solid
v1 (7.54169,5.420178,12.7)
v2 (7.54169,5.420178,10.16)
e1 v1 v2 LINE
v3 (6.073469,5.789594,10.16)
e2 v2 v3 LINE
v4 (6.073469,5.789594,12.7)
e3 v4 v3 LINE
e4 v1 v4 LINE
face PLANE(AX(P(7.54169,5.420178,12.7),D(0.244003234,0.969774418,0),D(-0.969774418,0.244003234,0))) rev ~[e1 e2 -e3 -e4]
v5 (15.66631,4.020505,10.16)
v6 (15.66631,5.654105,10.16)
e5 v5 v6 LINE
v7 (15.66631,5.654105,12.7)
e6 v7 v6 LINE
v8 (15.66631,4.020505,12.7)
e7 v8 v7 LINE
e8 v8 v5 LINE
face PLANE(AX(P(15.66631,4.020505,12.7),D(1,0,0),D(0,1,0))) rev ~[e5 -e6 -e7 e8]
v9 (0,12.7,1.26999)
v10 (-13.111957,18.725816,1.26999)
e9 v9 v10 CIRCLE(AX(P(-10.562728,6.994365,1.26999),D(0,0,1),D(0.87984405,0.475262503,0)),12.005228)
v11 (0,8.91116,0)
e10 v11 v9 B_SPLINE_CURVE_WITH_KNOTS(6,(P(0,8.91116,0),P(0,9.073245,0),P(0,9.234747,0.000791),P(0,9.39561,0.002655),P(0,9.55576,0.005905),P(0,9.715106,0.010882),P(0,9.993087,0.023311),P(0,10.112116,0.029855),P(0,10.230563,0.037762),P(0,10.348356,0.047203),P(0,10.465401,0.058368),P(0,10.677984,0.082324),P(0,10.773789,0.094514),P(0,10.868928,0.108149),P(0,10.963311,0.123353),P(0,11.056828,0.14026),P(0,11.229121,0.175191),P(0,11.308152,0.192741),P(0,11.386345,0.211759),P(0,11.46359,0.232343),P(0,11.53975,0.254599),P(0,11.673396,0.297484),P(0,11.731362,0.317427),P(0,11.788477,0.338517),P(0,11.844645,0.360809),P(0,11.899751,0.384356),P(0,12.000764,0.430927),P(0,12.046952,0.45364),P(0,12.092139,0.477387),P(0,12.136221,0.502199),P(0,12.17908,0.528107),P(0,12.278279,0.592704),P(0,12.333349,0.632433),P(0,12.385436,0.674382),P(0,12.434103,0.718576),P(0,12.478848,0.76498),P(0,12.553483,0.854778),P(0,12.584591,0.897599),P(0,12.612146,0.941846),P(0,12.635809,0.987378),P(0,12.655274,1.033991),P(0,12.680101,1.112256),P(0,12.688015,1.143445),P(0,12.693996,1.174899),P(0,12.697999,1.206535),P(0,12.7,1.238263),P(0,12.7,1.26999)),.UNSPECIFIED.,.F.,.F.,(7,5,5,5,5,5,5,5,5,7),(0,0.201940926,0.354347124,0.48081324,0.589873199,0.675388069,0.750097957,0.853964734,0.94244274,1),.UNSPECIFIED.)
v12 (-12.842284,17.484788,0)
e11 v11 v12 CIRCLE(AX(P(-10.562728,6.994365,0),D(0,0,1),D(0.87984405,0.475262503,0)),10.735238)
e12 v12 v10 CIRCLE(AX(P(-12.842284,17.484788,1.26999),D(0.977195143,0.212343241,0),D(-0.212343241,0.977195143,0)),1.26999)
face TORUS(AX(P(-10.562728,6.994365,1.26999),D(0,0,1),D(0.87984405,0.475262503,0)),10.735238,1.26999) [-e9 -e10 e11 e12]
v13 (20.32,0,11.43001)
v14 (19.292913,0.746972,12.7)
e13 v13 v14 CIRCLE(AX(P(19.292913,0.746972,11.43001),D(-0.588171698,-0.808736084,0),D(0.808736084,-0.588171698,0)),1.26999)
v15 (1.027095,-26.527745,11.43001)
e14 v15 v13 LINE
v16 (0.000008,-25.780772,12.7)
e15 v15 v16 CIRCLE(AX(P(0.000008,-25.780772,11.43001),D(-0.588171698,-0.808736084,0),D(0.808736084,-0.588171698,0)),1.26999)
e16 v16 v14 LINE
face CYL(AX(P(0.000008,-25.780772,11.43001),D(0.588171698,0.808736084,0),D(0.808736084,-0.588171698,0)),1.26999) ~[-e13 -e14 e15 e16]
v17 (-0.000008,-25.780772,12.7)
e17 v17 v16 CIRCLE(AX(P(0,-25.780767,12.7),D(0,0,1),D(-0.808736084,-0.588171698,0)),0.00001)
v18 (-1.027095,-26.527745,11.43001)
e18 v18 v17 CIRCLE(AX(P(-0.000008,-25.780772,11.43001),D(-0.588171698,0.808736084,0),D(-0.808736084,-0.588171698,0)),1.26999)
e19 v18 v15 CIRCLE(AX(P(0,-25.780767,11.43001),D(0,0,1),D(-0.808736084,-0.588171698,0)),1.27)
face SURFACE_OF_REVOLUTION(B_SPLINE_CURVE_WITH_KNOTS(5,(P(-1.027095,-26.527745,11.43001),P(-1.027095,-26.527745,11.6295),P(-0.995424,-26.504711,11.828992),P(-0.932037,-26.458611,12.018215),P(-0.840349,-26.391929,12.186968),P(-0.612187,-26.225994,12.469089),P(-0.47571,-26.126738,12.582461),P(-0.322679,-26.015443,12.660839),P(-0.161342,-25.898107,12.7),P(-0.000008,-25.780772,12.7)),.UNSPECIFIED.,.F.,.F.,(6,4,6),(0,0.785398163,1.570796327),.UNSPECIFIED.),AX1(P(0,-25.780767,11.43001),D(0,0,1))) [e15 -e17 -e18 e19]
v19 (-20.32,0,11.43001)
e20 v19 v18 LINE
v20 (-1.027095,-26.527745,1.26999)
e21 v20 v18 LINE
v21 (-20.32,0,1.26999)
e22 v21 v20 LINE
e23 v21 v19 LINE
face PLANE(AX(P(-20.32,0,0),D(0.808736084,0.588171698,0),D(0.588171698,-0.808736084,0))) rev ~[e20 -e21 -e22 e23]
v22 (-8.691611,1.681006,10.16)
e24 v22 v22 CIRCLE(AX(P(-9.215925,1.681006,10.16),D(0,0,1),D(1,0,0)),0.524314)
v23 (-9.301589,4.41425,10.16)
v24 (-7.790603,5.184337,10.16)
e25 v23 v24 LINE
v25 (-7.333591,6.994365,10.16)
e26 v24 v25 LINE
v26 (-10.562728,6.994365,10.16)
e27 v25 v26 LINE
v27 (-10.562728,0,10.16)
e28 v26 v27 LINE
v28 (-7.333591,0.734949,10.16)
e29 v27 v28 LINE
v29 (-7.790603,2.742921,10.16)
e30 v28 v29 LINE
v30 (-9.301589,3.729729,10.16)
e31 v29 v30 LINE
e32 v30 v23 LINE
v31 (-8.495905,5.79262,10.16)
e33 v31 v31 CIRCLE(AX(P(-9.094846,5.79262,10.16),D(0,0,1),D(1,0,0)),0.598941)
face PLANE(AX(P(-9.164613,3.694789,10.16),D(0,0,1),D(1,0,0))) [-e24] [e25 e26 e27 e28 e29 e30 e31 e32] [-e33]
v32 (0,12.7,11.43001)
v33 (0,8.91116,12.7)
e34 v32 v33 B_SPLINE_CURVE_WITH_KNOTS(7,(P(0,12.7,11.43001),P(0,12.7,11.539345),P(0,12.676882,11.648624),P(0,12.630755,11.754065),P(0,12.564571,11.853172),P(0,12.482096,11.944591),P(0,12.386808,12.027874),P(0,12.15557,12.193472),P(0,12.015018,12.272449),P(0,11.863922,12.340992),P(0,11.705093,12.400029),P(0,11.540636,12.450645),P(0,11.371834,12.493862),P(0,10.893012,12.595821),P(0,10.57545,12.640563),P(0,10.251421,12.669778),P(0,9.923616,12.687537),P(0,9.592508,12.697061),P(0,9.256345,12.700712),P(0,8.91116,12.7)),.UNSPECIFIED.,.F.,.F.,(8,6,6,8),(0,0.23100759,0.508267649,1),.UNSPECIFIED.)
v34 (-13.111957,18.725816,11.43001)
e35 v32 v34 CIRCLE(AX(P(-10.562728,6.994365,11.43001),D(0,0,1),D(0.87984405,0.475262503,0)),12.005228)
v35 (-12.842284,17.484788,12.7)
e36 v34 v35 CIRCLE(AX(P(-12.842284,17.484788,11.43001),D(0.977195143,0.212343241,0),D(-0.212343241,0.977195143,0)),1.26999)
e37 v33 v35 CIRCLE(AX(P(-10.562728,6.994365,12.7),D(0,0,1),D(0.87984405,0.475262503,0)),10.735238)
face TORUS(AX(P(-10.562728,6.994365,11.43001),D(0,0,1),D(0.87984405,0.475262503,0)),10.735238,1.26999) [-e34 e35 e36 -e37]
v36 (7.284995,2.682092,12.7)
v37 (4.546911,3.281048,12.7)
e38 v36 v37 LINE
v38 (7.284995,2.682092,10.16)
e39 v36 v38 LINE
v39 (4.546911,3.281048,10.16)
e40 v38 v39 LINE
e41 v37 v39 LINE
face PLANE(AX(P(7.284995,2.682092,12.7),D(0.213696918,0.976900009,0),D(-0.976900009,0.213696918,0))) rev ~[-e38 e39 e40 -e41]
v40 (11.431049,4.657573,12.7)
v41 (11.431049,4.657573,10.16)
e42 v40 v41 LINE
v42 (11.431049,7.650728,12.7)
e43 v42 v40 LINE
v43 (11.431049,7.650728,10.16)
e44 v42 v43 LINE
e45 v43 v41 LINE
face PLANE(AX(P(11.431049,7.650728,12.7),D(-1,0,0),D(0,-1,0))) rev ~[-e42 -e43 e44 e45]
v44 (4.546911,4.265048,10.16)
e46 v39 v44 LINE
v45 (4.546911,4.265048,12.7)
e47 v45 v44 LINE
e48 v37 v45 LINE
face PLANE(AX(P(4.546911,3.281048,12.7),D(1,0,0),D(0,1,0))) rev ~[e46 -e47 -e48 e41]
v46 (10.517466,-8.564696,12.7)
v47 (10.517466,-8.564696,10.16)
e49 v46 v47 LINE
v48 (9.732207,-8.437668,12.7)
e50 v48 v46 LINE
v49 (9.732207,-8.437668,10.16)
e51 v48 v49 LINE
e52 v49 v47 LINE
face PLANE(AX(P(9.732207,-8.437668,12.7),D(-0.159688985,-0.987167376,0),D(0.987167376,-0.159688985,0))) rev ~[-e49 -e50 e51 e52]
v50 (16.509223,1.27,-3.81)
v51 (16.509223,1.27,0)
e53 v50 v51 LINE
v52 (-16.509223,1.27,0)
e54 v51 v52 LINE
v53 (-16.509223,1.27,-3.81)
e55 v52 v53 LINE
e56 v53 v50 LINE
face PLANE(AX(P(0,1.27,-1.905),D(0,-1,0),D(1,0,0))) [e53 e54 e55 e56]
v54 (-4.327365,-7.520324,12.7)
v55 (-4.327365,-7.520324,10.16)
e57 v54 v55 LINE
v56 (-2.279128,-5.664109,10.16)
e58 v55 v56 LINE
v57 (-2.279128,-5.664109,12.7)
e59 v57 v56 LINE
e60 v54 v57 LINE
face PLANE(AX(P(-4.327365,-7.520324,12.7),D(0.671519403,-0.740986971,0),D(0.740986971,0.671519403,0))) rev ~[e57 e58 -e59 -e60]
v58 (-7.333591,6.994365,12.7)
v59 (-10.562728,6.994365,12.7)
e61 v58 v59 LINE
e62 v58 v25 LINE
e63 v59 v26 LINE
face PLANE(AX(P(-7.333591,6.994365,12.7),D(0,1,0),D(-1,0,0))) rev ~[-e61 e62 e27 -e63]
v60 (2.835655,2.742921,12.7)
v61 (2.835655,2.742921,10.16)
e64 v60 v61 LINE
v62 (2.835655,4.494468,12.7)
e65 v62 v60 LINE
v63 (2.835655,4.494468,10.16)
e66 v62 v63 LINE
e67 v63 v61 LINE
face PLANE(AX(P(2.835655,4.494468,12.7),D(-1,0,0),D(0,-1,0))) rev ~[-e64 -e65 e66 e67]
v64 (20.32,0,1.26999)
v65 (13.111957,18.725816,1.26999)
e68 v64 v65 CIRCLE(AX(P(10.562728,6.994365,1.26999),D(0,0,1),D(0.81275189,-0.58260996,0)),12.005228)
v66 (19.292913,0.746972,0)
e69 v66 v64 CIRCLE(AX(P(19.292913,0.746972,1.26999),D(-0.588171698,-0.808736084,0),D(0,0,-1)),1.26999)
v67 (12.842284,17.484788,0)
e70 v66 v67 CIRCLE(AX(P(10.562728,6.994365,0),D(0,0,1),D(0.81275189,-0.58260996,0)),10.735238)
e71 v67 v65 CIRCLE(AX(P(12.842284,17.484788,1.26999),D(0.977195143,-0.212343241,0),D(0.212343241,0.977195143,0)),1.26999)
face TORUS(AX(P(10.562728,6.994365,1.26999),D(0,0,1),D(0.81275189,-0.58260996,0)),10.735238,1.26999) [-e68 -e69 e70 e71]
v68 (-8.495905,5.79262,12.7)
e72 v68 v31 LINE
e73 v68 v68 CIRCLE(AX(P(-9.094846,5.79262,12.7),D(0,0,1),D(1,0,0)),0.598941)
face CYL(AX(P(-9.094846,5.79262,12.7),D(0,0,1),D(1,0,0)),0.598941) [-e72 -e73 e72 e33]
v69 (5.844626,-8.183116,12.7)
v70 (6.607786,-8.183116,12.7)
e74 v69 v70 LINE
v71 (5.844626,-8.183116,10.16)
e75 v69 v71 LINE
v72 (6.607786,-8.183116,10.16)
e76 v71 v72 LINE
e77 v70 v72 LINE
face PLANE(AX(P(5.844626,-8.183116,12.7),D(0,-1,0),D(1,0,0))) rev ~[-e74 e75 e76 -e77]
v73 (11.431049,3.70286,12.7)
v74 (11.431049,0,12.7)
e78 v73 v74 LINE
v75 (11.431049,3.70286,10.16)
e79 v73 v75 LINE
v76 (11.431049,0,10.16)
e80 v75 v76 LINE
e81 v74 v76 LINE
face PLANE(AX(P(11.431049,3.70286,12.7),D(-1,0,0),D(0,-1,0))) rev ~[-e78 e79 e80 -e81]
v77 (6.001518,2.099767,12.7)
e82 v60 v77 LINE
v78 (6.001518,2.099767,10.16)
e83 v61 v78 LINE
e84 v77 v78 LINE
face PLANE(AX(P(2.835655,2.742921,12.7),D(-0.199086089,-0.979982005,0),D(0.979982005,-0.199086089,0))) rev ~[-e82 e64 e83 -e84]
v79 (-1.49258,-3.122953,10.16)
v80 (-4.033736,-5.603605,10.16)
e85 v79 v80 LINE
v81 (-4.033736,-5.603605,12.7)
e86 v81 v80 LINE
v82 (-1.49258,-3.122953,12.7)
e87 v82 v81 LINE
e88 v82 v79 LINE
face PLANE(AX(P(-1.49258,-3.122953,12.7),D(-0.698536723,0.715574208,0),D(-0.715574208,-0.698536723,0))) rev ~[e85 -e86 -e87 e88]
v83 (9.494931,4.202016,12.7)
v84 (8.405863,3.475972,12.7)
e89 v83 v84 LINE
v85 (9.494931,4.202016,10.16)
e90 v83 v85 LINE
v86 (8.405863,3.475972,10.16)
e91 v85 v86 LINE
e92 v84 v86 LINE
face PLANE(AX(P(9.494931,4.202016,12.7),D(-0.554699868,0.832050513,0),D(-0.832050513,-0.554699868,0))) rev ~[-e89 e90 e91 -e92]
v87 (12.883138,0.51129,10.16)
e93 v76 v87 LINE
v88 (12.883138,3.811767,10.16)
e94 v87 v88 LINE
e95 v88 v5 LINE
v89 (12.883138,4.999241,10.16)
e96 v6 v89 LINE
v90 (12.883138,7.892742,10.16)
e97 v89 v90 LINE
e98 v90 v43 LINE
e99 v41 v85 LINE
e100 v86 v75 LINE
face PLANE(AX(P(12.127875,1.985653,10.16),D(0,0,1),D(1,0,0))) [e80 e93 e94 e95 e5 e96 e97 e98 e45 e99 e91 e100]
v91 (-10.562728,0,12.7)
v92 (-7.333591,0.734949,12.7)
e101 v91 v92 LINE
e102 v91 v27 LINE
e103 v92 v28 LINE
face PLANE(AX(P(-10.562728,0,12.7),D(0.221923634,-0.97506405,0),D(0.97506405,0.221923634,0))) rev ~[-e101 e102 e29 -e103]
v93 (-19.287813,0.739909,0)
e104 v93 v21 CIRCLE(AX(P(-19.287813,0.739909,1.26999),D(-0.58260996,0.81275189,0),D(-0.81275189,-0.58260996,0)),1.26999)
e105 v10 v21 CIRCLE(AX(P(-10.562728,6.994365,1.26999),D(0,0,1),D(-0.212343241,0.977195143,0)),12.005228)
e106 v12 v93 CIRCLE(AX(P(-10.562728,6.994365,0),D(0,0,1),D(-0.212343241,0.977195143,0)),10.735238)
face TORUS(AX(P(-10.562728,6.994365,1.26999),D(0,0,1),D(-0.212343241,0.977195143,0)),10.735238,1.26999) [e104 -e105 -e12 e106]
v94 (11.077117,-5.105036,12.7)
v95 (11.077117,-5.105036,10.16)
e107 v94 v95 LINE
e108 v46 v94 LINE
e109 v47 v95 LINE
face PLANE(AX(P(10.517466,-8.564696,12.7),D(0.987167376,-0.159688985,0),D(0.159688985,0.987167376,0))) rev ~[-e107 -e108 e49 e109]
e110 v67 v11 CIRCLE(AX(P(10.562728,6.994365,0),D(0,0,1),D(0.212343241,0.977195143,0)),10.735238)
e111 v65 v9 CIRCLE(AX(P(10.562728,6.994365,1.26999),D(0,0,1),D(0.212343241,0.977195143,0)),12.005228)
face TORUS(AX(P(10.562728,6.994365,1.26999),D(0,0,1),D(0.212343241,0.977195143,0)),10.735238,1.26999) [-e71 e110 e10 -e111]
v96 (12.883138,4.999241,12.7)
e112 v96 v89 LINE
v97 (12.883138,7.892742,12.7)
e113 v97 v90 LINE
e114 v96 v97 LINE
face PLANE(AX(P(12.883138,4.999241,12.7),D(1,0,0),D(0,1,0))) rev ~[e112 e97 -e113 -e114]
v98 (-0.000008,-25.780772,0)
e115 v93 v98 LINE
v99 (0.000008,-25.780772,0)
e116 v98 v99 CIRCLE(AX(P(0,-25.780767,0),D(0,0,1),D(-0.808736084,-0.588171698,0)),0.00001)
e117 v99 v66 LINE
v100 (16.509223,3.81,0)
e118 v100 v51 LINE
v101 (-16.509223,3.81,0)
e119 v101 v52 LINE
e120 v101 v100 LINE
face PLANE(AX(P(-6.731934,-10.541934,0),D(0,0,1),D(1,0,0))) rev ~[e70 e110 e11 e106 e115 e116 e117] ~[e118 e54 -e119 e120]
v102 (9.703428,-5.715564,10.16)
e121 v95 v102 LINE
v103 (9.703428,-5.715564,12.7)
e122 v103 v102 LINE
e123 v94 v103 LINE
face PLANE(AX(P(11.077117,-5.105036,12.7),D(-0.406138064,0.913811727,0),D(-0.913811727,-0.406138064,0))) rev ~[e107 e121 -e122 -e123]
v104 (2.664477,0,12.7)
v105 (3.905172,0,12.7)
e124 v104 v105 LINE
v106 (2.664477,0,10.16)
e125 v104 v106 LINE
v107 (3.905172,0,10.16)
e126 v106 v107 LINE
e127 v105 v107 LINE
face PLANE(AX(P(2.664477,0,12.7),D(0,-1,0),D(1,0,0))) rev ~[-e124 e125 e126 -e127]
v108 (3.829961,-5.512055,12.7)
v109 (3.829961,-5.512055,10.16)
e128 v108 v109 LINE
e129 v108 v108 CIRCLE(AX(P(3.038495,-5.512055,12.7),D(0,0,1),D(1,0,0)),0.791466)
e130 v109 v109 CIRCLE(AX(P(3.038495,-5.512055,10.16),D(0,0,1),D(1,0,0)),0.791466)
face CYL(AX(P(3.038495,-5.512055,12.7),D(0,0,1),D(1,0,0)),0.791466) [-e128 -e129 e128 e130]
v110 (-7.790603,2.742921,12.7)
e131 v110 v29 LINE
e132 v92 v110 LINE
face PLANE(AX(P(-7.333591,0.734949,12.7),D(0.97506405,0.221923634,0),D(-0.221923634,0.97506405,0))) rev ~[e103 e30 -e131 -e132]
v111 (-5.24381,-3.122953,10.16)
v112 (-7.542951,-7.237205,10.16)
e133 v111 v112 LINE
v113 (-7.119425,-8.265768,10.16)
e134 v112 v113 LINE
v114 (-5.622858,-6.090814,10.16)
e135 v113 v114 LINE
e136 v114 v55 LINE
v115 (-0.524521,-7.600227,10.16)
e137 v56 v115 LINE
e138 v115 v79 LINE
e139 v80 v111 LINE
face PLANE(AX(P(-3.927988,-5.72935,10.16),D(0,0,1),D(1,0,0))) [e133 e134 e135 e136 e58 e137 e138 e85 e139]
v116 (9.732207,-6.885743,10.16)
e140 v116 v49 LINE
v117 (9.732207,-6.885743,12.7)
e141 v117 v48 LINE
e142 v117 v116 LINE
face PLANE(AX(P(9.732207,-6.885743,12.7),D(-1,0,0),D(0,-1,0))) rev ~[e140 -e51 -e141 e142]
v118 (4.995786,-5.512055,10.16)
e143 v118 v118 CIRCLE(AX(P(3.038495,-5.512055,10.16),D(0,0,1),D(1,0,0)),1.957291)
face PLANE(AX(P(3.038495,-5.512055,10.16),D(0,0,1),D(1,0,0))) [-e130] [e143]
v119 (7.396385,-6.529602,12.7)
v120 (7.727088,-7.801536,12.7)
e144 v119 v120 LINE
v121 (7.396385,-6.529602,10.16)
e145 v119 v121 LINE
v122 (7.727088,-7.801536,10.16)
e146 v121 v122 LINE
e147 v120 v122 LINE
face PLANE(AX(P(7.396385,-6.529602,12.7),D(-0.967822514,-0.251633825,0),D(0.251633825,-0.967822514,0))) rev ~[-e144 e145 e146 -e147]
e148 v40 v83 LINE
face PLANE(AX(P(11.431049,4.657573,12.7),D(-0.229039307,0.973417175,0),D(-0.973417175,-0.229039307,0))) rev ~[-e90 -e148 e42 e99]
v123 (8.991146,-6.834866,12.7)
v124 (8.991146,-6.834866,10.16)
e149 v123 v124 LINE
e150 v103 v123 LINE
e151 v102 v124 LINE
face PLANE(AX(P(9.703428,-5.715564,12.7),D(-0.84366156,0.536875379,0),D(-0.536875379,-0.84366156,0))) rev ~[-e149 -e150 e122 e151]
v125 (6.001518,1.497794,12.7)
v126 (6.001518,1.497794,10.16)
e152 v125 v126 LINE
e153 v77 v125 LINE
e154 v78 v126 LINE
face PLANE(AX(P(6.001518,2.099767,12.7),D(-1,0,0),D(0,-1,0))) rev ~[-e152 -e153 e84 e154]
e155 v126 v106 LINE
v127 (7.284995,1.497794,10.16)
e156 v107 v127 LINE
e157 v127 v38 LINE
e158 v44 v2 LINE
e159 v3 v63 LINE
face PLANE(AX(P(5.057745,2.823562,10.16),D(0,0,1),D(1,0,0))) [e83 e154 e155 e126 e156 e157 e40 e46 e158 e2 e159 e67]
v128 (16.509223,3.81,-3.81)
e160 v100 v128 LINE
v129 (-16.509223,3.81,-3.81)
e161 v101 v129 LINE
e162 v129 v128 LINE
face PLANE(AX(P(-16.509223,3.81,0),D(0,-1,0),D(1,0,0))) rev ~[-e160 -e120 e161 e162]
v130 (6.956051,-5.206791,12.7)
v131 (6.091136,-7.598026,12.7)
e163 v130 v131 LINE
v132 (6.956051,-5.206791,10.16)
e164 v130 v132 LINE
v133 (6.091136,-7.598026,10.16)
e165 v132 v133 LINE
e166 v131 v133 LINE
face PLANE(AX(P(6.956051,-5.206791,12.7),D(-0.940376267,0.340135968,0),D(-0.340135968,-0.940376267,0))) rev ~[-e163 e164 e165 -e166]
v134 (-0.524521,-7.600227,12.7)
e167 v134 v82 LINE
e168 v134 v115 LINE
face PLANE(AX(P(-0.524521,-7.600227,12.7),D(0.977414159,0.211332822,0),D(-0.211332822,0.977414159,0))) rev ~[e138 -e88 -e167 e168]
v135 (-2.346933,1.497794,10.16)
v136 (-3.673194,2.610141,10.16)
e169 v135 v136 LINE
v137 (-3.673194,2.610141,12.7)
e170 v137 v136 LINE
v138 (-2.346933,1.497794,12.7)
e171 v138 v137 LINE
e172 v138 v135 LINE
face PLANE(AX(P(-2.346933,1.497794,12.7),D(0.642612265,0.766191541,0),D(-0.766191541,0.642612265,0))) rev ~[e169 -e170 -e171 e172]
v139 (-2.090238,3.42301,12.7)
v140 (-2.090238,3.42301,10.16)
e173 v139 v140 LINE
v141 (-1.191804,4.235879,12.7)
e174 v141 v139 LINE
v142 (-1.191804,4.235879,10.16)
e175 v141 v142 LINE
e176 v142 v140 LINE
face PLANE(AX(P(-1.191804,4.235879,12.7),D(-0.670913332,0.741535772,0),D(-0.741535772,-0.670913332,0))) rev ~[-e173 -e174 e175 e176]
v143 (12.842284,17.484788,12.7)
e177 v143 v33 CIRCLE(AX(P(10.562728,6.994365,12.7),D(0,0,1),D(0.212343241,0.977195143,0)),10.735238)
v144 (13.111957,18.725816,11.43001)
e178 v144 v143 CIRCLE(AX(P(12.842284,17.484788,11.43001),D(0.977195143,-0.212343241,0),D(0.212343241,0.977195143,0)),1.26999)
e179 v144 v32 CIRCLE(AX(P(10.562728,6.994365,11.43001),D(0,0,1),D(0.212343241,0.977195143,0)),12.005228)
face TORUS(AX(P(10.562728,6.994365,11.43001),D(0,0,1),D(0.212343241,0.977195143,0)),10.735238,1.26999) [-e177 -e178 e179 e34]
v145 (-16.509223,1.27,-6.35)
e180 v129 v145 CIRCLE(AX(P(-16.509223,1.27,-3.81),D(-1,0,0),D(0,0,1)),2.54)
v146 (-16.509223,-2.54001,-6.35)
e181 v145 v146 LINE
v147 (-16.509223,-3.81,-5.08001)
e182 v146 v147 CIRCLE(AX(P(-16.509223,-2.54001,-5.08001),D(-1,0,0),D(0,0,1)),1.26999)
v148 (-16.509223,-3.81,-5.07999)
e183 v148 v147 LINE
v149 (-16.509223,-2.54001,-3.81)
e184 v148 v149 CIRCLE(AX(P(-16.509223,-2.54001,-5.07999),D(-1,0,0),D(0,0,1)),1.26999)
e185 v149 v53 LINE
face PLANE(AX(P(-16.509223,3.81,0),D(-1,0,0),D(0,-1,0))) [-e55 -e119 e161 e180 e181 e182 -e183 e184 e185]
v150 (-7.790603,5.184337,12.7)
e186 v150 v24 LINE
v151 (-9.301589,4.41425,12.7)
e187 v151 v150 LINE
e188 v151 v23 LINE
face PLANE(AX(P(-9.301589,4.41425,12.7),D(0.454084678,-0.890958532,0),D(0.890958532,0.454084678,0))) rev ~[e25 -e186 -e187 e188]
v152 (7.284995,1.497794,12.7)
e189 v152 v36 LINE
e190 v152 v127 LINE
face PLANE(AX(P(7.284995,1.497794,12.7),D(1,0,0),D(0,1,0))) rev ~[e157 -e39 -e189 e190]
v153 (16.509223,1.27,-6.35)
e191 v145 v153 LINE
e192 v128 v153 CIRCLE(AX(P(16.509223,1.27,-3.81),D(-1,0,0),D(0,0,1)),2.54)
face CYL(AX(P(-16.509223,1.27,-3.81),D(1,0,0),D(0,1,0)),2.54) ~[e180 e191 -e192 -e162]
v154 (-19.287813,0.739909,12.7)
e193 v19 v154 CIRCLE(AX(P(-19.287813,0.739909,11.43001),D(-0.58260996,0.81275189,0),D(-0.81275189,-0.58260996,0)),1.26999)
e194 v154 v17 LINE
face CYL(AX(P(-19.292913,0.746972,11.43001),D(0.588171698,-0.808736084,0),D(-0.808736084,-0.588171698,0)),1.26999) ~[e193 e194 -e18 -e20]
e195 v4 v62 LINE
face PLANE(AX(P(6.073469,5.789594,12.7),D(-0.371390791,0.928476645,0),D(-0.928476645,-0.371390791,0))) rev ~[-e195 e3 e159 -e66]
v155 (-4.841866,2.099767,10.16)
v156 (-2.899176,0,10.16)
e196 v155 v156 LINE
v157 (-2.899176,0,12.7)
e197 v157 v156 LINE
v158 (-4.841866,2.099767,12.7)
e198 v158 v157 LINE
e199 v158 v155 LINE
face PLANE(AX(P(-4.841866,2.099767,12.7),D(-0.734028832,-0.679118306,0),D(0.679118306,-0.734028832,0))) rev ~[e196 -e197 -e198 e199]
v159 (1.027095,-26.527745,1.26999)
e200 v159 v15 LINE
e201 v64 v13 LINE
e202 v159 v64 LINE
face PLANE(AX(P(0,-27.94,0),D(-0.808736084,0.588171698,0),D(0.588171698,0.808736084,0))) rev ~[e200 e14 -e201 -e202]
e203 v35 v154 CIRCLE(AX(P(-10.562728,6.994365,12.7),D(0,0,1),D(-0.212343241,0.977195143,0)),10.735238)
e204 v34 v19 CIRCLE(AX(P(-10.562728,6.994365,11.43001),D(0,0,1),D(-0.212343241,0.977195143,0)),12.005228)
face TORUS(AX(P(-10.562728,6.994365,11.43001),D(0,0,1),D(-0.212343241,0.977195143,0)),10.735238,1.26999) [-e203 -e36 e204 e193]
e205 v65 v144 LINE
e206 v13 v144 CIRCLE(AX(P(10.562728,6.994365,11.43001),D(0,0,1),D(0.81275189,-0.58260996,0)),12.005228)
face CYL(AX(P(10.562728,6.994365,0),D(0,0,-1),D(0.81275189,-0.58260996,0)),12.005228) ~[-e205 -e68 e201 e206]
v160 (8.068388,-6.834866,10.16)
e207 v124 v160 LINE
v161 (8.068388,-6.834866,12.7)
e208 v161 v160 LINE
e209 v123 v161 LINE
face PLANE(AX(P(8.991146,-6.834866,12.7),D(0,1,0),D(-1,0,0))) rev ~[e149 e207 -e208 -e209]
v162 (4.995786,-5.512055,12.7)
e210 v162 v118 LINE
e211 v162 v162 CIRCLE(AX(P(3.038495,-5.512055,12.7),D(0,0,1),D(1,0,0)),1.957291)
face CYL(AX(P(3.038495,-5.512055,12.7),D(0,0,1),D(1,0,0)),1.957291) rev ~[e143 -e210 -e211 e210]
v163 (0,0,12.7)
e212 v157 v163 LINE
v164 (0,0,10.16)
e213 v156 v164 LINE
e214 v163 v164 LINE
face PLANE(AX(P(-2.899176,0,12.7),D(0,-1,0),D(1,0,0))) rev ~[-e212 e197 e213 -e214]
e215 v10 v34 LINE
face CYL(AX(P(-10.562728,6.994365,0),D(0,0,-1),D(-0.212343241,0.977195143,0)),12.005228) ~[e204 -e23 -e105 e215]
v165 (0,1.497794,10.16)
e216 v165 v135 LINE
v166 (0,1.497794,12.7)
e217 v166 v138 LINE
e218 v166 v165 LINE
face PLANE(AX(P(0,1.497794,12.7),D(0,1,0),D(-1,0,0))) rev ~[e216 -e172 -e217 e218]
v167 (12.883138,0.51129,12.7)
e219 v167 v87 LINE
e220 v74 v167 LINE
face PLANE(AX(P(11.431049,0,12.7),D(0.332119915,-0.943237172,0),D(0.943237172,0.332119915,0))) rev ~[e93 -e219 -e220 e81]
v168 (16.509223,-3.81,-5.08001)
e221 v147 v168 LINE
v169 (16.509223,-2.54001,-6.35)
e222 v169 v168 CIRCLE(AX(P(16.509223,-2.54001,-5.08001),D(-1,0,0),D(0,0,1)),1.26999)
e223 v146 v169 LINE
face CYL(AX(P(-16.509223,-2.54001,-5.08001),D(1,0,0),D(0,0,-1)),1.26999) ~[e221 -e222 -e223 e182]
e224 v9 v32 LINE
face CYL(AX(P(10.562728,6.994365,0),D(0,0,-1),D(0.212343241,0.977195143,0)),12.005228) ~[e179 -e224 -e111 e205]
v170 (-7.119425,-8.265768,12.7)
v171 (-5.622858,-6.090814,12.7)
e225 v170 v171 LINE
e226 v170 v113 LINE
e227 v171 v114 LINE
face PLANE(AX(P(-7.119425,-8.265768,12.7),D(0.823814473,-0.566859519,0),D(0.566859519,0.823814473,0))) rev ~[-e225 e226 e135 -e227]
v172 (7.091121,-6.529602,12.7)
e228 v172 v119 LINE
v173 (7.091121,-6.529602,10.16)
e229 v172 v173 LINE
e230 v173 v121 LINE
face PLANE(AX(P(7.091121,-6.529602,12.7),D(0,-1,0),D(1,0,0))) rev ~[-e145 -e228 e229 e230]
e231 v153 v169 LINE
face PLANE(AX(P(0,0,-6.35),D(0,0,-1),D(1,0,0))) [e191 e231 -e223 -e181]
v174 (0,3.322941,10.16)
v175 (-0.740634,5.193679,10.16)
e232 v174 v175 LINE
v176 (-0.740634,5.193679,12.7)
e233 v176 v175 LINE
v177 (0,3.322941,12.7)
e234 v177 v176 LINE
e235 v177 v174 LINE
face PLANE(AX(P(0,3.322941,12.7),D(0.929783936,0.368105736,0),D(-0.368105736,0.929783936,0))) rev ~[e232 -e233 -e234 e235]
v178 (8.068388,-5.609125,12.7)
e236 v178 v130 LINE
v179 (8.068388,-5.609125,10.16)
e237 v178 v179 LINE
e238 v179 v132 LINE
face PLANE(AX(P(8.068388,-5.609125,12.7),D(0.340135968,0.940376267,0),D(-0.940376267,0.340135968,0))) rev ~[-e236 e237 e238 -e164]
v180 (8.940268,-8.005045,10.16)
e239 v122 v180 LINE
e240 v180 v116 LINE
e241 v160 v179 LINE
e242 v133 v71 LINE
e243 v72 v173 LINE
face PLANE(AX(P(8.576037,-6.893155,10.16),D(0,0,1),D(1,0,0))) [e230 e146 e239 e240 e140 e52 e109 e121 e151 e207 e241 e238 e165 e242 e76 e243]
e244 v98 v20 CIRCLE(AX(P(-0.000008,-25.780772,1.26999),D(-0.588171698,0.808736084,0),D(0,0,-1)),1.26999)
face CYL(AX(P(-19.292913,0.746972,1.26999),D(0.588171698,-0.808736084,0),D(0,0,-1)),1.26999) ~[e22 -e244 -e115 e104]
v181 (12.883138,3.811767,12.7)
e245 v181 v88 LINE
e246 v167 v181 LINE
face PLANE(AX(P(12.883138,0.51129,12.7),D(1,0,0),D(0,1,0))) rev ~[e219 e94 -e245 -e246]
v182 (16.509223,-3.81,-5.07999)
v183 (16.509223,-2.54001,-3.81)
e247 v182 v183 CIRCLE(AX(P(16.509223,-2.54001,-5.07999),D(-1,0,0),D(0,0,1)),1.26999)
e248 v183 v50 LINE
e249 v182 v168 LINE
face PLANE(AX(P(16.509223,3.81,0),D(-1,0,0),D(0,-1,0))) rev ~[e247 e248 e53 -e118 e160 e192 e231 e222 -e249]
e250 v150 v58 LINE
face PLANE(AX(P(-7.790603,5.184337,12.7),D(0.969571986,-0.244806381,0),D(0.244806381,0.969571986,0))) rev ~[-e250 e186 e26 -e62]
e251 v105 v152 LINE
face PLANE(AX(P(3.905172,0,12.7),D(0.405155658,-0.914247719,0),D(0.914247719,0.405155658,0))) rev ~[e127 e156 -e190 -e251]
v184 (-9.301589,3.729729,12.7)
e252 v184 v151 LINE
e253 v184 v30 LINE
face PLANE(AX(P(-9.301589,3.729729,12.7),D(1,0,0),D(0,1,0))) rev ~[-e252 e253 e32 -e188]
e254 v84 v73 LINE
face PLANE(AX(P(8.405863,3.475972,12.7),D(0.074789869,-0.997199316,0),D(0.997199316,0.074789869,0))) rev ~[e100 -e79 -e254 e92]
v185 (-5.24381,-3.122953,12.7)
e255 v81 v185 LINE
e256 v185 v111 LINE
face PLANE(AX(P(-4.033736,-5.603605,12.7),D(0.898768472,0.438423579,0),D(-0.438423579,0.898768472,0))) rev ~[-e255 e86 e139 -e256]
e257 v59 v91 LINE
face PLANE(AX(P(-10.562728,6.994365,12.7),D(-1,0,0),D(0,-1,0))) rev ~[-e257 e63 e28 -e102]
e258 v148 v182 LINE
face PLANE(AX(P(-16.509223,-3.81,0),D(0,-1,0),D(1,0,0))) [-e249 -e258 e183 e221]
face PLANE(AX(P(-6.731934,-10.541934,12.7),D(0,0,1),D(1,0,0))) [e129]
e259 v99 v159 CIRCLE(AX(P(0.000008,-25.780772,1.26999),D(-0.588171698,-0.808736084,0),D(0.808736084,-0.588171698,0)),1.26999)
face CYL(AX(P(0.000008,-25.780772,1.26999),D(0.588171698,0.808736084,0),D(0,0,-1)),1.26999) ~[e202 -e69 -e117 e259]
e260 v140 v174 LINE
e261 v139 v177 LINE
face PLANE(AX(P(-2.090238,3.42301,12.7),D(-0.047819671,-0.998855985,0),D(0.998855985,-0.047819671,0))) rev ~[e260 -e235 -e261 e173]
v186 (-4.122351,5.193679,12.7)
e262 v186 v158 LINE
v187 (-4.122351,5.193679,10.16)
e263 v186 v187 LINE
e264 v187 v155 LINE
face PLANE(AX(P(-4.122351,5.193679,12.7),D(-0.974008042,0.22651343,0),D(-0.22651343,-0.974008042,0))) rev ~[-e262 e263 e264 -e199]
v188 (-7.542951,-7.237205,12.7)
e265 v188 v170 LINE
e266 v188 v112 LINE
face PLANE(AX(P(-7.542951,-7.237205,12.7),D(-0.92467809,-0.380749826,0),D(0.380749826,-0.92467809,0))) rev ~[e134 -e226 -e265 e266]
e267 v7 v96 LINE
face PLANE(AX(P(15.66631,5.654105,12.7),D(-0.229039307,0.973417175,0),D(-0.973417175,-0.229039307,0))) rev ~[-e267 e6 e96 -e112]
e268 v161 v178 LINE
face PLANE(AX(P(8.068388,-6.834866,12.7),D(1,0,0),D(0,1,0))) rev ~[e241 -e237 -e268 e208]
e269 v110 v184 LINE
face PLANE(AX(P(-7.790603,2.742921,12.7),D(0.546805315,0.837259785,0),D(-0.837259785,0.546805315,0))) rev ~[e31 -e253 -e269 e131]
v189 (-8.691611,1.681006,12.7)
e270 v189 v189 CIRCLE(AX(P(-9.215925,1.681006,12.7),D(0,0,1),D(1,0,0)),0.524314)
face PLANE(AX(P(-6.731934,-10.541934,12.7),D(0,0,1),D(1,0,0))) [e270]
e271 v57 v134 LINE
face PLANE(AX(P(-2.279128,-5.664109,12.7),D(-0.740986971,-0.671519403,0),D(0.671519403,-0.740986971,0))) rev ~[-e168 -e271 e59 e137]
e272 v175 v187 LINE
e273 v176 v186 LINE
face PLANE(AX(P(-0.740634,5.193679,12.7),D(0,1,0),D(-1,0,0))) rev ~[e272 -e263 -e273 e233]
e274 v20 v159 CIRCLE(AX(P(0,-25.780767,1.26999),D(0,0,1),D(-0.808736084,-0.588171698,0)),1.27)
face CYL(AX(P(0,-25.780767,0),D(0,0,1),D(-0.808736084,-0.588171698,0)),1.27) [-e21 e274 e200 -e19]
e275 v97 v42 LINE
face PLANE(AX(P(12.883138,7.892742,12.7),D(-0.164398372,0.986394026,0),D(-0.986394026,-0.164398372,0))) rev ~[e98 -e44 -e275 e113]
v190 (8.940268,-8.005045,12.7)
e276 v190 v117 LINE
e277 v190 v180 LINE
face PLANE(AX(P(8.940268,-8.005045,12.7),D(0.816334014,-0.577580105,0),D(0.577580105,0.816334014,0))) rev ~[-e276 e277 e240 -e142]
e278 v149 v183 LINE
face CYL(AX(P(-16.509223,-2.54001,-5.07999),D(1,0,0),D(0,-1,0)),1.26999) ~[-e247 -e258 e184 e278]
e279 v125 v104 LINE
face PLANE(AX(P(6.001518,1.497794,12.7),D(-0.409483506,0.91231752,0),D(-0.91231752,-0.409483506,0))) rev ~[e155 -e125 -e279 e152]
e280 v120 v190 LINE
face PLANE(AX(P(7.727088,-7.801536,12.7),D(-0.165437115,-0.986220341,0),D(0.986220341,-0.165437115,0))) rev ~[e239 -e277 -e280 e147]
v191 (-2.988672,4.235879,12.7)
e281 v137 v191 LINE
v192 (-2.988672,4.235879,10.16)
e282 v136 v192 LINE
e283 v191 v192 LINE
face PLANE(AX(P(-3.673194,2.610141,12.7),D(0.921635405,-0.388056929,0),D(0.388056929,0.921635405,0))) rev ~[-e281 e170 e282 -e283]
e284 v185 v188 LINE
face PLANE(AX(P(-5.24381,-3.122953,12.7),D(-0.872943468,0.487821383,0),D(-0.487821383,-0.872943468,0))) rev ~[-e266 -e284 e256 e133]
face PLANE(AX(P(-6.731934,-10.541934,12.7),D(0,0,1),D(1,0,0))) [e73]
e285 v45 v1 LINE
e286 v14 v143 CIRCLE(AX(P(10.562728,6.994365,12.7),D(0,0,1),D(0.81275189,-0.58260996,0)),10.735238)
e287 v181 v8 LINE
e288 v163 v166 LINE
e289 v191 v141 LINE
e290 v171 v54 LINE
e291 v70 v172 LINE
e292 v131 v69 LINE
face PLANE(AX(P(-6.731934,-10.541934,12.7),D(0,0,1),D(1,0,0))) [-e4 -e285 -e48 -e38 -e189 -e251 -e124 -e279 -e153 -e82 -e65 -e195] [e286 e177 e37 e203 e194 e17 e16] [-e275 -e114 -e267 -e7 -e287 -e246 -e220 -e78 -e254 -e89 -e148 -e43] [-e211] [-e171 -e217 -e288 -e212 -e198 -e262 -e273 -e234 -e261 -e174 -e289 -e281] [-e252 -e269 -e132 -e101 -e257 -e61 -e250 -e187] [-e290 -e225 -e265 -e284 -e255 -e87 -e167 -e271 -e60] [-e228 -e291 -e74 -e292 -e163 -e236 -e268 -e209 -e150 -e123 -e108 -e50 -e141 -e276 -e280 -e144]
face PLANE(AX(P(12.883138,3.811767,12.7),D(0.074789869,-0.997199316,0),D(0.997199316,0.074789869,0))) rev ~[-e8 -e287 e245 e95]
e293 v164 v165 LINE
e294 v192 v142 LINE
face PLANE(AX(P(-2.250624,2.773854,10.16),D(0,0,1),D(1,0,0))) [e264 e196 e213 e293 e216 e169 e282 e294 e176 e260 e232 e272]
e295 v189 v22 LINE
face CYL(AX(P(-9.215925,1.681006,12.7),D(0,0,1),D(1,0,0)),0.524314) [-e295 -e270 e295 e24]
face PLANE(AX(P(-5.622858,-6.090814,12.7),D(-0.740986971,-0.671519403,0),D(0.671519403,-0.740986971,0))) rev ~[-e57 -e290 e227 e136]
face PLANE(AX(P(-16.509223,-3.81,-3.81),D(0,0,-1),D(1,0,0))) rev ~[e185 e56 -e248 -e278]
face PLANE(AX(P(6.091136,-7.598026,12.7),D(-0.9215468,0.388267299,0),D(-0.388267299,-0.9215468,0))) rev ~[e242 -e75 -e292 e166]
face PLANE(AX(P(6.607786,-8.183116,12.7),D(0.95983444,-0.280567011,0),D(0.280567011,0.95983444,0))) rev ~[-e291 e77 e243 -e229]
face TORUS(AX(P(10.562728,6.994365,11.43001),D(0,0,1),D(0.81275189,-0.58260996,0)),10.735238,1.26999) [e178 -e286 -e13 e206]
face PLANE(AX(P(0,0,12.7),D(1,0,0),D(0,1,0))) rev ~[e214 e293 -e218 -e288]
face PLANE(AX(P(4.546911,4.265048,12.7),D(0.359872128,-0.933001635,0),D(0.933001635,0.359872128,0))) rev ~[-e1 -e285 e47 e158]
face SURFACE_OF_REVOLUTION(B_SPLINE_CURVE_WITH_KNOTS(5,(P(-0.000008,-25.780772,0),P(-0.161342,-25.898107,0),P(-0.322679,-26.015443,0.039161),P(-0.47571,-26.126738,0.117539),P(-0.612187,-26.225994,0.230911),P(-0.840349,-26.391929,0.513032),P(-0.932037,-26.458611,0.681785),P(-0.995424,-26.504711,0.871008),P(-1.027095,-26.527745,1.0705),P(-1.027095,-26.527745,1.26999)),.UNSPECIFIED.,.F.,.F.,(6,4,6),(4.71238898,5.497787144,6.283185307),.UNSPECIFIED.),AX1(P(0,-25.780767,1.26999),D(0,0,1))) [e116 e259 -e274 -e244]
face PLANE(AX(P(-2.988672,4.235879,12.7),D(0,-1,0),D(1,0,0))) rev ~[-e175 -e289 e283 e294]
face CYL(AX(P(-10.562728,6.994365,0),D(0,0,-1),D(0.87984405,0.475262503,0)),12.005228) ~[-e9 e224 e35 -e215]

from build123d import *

# Parameters (mm, degrees)
F1_DEPTH  = 12.7
F2_R      = 1.27
F3_W      = 33.0184467606
F3_H      = 7.62
F4_DEPTH  = 6.35
F6_DEPTH  = 5.08
F7_R      = 2.54
F8_R      = 1.26999
F10_R     = 0.5243142603
F10_R_2   = 0.598941464
F10_R_3   = 1.9572905624
F10_R_4   = 0.79146579
F11_DEPTH = 2.54


# Not quite as in the source:
# - a fillet or chamfer is up to 0.001 mm smaller than in the source, because OpenCascade refuses the exact size
# - a feature of the source that left no trace in its solid (it failed there, or was rolled back) is left out


with BuildPart() as f1:
    # F0 (on Top) → F1 (new body)
    with BuildSketch(Plane.XY):
        Polygon((0, -27.94), (0, 0), (-20.32, 0), align=None)
        with BuildLine():
            Line((-20.32, 0), (0, 0))
            Line((0, 0), (-13.111957335, 18.7258157324))
            ThreePointArc((-13.111957335, 18.7258157324), (-21.7665907667, 11.3070168981), (-20.32, 0))
        make_face()
        with BuildLine():
            Line((0, 0), (0, 12.7))
            ThreePointArc((0, 12.7), (-5.5495799526, 17.902795111), (-13.111957335, 18.7258157324))
            Line((-13.111957335, 18.7258157324), (0, 0))
        make_face()
        with BuildLine():
            ThreePointArc((13.111957335, 18.7258157324), (5.5495799526, 17.902795111), (0, 12.7))
            Line((0, 12.7), (0, 0))
            Line((0, 0), (13.111957335, 18.7258157324))
        make_face()
        with BuildLine():
            Line((13.111957335, 18.7258157324), (0, 0))
            Line((0, 0), (20.32, 0))
            ThreePointArc((20.32, 0), (21.7665907667, 11.3070168981), (13.111957335, 18.7258157324))
        make_face()
        Polygon((20.32, 0), (0, 0), (0, -27.94), align=None)
    extrude(amount=F1_DEPTH)

    # F2
    f2_edges = [f1.edges().sort_by_distance(p)[0] for p in [
        (0, -27.94, 6.35),
    ]]
    fillet(f2_edges, radius=F2_R)

    # F3 (on face) → F4 (join)
    with BuildSketch(Plane(origin=(0, 0, 0), x_dir=(1, 0, 0), z_dir=(0, 0, -1))):
        Rectangle(F3_W, F3_H)
    extrude(amount=F4_DEPTH)

    # F5 (on face) → F6 (cut)
    with BuildSketch(Plane.XZ.offset(3.81)):
        Polygon((-16.5092233803, -3.81), (0, -3.81), (16.5092233803, -3.81), (16.5092233803, 0), (-16.5092233803, 0), align=None)
    extrude(amount=-F6_DEPTH, mode=Mode.SUBTRACT)

    # F7
    f7_edges = [f1.edges().sort_by_distance(p)[0] for p in [
        (0, 3.81, -6.35),
    ]]
    fillet(f7_edges, radius=F7_R)

    # F8 (radius 1.27 in the source; OpenCascade refuses exactly that, so slightly less here)
    f8_edges = [f1.edges().sort_by_distance(p)[0] for p in [
        (0, -3.81, -3.81),
        (0, -3.81, -6.35),
        (-10.673547, -13.263872, 12.7),
        (10.673547, -13.263872, 0),
    ]]
    fillet(f8_edges, radius=F8_R)

    # F10 (on face) → F11 (cut)
    with BuildSketch(Plane.XY.offset(12.7)):
        Polygon((-7.3335906491, 6.9943653395), (-10.5627283372, 6.9943653395), (-10.5627283372, 0), (-7.3335906491, 0.7349486114), (-7.79060311, 2.7429205143), (-9.3015888706, 3.7297289819), (-9.3015888706, 4.4142501429), (-7.79060311, 5.1843370311), align=None)
        with Locations((-9.2159248888, 1.6810059315)):
            Circle(F10_R, mode=Mode.SUBTRACT)
        with Locations((-9.0948464349, 5.7926201262)):
            Circle(F10_R_2, mode=Mode.SUBTRACT)
        Polygon((-5.2438098937, -3.1229529995), (-7.5429510325, -7.2372052819), (-7.1194251068, -8.2657681778), (-5.6228582704, -6.0908141027), (-4.3273653508, -7.5203236143), (-2.2791281808, -5.6641087867), (-0.5245208158, -7.6002273709), (-1.4925802825, -3.1229529995), (-4.0337359533, -5.60360495), align=None)
        Polygon((-2.0902381511, 3.4230099991), (0, 3.3229410183), (-0.7406336372, 5.1936786622), (-4.1223512962, 5.1936786622), (-4.841865506, 2.0997666288), (-2.8991762083, 0), (0, 0), (0, 1.4977937099), (-2.3469333537, 1.4977937099), (-3.6731935106, 2.6101409458), (-2.9886723496, 4.2358790524), (-1.1918039527, 4.2358790524), align=None)
        Polygon((7.5416904874, 5.4201777093), (6.0734692961, 5.7895942591), (2.8356553521, 4.4944682159), (2.8356553521, 2.7429205143), (6.001518108, 2.0997666288), (6.001518108, 1.4977937099), (2.6644766331, 0), (3.9051719941, 0), (7.2849951684, 1.4977937099), (7.2849951684, 2.6820923667), (4.5469105244, 3.281048499), (4.5469105244, 4.2650480755), align=None)
        Polygon((12.8831379116, 3.8117669891), (11.4310486242, 3.702860409), (11.4310486242, 0), (12.8831379116, 0.5112900399), align=None)
        Polygon((11.4310486242, 3.702860409), (11.4310486242, 4.6575730793), (9.4949305058, 4.2020159308), (8.4058633074, 3.4759717528), align=None)
        Polygon((12.8831379116, 7.8927418217), (11.4310486242, 7.6507278718), (11.4310486242, 4.6575730793), (12.8831379116, 4.999241105), align=None)
        Polygon((15.6663097441, 5.6541049853), (12.8831379116, 4.999241105), (12.8831379116, 3.8117669891), (15.6663097441, 4.0205046535), align=None)
        Polygon((12.8831379116, 4.999241105), (11.4310486242, 4.6575730793), (11.4310486242, 3.702860409), (12.8831379116, 3.8117669891), align=None)
        Polygon((6.9560511038, -5.2067907527), (6.0911364853, -7.59802619), (5.8446256444, -8.1831160933), (6.6077862866, -8.1831160933), (7.0911212824, -6.5296017565), (7.3963850737, -6.5296017565), (7.727087941, -7.801536005), (8.9402683079, -8.0050453544), (9.7322071764, -6.8857432343), (9.7322071764, -8.4376684573), (10.517465882, -8.5646957159), (11.0771171749, -5.1050363109), (9.7034284845, -5.7155638933), (8.9911455289, -6.8348660134), (8.0683877672, -6.8348660134), (8.0683877672, -5.6091251385), align=None)
        with Locations((3.0384953134, -5.5120550096)):
            Circle(F10_R_3)
        with Locations((3.0384953134, -5.5120550096)):
            Circle(F10_R_4, mode=Mode.SUBTRACT)
    extrude(amount=-F11_DEPTH, mode=Mode.SUBTRACT)


solid = f1.part
